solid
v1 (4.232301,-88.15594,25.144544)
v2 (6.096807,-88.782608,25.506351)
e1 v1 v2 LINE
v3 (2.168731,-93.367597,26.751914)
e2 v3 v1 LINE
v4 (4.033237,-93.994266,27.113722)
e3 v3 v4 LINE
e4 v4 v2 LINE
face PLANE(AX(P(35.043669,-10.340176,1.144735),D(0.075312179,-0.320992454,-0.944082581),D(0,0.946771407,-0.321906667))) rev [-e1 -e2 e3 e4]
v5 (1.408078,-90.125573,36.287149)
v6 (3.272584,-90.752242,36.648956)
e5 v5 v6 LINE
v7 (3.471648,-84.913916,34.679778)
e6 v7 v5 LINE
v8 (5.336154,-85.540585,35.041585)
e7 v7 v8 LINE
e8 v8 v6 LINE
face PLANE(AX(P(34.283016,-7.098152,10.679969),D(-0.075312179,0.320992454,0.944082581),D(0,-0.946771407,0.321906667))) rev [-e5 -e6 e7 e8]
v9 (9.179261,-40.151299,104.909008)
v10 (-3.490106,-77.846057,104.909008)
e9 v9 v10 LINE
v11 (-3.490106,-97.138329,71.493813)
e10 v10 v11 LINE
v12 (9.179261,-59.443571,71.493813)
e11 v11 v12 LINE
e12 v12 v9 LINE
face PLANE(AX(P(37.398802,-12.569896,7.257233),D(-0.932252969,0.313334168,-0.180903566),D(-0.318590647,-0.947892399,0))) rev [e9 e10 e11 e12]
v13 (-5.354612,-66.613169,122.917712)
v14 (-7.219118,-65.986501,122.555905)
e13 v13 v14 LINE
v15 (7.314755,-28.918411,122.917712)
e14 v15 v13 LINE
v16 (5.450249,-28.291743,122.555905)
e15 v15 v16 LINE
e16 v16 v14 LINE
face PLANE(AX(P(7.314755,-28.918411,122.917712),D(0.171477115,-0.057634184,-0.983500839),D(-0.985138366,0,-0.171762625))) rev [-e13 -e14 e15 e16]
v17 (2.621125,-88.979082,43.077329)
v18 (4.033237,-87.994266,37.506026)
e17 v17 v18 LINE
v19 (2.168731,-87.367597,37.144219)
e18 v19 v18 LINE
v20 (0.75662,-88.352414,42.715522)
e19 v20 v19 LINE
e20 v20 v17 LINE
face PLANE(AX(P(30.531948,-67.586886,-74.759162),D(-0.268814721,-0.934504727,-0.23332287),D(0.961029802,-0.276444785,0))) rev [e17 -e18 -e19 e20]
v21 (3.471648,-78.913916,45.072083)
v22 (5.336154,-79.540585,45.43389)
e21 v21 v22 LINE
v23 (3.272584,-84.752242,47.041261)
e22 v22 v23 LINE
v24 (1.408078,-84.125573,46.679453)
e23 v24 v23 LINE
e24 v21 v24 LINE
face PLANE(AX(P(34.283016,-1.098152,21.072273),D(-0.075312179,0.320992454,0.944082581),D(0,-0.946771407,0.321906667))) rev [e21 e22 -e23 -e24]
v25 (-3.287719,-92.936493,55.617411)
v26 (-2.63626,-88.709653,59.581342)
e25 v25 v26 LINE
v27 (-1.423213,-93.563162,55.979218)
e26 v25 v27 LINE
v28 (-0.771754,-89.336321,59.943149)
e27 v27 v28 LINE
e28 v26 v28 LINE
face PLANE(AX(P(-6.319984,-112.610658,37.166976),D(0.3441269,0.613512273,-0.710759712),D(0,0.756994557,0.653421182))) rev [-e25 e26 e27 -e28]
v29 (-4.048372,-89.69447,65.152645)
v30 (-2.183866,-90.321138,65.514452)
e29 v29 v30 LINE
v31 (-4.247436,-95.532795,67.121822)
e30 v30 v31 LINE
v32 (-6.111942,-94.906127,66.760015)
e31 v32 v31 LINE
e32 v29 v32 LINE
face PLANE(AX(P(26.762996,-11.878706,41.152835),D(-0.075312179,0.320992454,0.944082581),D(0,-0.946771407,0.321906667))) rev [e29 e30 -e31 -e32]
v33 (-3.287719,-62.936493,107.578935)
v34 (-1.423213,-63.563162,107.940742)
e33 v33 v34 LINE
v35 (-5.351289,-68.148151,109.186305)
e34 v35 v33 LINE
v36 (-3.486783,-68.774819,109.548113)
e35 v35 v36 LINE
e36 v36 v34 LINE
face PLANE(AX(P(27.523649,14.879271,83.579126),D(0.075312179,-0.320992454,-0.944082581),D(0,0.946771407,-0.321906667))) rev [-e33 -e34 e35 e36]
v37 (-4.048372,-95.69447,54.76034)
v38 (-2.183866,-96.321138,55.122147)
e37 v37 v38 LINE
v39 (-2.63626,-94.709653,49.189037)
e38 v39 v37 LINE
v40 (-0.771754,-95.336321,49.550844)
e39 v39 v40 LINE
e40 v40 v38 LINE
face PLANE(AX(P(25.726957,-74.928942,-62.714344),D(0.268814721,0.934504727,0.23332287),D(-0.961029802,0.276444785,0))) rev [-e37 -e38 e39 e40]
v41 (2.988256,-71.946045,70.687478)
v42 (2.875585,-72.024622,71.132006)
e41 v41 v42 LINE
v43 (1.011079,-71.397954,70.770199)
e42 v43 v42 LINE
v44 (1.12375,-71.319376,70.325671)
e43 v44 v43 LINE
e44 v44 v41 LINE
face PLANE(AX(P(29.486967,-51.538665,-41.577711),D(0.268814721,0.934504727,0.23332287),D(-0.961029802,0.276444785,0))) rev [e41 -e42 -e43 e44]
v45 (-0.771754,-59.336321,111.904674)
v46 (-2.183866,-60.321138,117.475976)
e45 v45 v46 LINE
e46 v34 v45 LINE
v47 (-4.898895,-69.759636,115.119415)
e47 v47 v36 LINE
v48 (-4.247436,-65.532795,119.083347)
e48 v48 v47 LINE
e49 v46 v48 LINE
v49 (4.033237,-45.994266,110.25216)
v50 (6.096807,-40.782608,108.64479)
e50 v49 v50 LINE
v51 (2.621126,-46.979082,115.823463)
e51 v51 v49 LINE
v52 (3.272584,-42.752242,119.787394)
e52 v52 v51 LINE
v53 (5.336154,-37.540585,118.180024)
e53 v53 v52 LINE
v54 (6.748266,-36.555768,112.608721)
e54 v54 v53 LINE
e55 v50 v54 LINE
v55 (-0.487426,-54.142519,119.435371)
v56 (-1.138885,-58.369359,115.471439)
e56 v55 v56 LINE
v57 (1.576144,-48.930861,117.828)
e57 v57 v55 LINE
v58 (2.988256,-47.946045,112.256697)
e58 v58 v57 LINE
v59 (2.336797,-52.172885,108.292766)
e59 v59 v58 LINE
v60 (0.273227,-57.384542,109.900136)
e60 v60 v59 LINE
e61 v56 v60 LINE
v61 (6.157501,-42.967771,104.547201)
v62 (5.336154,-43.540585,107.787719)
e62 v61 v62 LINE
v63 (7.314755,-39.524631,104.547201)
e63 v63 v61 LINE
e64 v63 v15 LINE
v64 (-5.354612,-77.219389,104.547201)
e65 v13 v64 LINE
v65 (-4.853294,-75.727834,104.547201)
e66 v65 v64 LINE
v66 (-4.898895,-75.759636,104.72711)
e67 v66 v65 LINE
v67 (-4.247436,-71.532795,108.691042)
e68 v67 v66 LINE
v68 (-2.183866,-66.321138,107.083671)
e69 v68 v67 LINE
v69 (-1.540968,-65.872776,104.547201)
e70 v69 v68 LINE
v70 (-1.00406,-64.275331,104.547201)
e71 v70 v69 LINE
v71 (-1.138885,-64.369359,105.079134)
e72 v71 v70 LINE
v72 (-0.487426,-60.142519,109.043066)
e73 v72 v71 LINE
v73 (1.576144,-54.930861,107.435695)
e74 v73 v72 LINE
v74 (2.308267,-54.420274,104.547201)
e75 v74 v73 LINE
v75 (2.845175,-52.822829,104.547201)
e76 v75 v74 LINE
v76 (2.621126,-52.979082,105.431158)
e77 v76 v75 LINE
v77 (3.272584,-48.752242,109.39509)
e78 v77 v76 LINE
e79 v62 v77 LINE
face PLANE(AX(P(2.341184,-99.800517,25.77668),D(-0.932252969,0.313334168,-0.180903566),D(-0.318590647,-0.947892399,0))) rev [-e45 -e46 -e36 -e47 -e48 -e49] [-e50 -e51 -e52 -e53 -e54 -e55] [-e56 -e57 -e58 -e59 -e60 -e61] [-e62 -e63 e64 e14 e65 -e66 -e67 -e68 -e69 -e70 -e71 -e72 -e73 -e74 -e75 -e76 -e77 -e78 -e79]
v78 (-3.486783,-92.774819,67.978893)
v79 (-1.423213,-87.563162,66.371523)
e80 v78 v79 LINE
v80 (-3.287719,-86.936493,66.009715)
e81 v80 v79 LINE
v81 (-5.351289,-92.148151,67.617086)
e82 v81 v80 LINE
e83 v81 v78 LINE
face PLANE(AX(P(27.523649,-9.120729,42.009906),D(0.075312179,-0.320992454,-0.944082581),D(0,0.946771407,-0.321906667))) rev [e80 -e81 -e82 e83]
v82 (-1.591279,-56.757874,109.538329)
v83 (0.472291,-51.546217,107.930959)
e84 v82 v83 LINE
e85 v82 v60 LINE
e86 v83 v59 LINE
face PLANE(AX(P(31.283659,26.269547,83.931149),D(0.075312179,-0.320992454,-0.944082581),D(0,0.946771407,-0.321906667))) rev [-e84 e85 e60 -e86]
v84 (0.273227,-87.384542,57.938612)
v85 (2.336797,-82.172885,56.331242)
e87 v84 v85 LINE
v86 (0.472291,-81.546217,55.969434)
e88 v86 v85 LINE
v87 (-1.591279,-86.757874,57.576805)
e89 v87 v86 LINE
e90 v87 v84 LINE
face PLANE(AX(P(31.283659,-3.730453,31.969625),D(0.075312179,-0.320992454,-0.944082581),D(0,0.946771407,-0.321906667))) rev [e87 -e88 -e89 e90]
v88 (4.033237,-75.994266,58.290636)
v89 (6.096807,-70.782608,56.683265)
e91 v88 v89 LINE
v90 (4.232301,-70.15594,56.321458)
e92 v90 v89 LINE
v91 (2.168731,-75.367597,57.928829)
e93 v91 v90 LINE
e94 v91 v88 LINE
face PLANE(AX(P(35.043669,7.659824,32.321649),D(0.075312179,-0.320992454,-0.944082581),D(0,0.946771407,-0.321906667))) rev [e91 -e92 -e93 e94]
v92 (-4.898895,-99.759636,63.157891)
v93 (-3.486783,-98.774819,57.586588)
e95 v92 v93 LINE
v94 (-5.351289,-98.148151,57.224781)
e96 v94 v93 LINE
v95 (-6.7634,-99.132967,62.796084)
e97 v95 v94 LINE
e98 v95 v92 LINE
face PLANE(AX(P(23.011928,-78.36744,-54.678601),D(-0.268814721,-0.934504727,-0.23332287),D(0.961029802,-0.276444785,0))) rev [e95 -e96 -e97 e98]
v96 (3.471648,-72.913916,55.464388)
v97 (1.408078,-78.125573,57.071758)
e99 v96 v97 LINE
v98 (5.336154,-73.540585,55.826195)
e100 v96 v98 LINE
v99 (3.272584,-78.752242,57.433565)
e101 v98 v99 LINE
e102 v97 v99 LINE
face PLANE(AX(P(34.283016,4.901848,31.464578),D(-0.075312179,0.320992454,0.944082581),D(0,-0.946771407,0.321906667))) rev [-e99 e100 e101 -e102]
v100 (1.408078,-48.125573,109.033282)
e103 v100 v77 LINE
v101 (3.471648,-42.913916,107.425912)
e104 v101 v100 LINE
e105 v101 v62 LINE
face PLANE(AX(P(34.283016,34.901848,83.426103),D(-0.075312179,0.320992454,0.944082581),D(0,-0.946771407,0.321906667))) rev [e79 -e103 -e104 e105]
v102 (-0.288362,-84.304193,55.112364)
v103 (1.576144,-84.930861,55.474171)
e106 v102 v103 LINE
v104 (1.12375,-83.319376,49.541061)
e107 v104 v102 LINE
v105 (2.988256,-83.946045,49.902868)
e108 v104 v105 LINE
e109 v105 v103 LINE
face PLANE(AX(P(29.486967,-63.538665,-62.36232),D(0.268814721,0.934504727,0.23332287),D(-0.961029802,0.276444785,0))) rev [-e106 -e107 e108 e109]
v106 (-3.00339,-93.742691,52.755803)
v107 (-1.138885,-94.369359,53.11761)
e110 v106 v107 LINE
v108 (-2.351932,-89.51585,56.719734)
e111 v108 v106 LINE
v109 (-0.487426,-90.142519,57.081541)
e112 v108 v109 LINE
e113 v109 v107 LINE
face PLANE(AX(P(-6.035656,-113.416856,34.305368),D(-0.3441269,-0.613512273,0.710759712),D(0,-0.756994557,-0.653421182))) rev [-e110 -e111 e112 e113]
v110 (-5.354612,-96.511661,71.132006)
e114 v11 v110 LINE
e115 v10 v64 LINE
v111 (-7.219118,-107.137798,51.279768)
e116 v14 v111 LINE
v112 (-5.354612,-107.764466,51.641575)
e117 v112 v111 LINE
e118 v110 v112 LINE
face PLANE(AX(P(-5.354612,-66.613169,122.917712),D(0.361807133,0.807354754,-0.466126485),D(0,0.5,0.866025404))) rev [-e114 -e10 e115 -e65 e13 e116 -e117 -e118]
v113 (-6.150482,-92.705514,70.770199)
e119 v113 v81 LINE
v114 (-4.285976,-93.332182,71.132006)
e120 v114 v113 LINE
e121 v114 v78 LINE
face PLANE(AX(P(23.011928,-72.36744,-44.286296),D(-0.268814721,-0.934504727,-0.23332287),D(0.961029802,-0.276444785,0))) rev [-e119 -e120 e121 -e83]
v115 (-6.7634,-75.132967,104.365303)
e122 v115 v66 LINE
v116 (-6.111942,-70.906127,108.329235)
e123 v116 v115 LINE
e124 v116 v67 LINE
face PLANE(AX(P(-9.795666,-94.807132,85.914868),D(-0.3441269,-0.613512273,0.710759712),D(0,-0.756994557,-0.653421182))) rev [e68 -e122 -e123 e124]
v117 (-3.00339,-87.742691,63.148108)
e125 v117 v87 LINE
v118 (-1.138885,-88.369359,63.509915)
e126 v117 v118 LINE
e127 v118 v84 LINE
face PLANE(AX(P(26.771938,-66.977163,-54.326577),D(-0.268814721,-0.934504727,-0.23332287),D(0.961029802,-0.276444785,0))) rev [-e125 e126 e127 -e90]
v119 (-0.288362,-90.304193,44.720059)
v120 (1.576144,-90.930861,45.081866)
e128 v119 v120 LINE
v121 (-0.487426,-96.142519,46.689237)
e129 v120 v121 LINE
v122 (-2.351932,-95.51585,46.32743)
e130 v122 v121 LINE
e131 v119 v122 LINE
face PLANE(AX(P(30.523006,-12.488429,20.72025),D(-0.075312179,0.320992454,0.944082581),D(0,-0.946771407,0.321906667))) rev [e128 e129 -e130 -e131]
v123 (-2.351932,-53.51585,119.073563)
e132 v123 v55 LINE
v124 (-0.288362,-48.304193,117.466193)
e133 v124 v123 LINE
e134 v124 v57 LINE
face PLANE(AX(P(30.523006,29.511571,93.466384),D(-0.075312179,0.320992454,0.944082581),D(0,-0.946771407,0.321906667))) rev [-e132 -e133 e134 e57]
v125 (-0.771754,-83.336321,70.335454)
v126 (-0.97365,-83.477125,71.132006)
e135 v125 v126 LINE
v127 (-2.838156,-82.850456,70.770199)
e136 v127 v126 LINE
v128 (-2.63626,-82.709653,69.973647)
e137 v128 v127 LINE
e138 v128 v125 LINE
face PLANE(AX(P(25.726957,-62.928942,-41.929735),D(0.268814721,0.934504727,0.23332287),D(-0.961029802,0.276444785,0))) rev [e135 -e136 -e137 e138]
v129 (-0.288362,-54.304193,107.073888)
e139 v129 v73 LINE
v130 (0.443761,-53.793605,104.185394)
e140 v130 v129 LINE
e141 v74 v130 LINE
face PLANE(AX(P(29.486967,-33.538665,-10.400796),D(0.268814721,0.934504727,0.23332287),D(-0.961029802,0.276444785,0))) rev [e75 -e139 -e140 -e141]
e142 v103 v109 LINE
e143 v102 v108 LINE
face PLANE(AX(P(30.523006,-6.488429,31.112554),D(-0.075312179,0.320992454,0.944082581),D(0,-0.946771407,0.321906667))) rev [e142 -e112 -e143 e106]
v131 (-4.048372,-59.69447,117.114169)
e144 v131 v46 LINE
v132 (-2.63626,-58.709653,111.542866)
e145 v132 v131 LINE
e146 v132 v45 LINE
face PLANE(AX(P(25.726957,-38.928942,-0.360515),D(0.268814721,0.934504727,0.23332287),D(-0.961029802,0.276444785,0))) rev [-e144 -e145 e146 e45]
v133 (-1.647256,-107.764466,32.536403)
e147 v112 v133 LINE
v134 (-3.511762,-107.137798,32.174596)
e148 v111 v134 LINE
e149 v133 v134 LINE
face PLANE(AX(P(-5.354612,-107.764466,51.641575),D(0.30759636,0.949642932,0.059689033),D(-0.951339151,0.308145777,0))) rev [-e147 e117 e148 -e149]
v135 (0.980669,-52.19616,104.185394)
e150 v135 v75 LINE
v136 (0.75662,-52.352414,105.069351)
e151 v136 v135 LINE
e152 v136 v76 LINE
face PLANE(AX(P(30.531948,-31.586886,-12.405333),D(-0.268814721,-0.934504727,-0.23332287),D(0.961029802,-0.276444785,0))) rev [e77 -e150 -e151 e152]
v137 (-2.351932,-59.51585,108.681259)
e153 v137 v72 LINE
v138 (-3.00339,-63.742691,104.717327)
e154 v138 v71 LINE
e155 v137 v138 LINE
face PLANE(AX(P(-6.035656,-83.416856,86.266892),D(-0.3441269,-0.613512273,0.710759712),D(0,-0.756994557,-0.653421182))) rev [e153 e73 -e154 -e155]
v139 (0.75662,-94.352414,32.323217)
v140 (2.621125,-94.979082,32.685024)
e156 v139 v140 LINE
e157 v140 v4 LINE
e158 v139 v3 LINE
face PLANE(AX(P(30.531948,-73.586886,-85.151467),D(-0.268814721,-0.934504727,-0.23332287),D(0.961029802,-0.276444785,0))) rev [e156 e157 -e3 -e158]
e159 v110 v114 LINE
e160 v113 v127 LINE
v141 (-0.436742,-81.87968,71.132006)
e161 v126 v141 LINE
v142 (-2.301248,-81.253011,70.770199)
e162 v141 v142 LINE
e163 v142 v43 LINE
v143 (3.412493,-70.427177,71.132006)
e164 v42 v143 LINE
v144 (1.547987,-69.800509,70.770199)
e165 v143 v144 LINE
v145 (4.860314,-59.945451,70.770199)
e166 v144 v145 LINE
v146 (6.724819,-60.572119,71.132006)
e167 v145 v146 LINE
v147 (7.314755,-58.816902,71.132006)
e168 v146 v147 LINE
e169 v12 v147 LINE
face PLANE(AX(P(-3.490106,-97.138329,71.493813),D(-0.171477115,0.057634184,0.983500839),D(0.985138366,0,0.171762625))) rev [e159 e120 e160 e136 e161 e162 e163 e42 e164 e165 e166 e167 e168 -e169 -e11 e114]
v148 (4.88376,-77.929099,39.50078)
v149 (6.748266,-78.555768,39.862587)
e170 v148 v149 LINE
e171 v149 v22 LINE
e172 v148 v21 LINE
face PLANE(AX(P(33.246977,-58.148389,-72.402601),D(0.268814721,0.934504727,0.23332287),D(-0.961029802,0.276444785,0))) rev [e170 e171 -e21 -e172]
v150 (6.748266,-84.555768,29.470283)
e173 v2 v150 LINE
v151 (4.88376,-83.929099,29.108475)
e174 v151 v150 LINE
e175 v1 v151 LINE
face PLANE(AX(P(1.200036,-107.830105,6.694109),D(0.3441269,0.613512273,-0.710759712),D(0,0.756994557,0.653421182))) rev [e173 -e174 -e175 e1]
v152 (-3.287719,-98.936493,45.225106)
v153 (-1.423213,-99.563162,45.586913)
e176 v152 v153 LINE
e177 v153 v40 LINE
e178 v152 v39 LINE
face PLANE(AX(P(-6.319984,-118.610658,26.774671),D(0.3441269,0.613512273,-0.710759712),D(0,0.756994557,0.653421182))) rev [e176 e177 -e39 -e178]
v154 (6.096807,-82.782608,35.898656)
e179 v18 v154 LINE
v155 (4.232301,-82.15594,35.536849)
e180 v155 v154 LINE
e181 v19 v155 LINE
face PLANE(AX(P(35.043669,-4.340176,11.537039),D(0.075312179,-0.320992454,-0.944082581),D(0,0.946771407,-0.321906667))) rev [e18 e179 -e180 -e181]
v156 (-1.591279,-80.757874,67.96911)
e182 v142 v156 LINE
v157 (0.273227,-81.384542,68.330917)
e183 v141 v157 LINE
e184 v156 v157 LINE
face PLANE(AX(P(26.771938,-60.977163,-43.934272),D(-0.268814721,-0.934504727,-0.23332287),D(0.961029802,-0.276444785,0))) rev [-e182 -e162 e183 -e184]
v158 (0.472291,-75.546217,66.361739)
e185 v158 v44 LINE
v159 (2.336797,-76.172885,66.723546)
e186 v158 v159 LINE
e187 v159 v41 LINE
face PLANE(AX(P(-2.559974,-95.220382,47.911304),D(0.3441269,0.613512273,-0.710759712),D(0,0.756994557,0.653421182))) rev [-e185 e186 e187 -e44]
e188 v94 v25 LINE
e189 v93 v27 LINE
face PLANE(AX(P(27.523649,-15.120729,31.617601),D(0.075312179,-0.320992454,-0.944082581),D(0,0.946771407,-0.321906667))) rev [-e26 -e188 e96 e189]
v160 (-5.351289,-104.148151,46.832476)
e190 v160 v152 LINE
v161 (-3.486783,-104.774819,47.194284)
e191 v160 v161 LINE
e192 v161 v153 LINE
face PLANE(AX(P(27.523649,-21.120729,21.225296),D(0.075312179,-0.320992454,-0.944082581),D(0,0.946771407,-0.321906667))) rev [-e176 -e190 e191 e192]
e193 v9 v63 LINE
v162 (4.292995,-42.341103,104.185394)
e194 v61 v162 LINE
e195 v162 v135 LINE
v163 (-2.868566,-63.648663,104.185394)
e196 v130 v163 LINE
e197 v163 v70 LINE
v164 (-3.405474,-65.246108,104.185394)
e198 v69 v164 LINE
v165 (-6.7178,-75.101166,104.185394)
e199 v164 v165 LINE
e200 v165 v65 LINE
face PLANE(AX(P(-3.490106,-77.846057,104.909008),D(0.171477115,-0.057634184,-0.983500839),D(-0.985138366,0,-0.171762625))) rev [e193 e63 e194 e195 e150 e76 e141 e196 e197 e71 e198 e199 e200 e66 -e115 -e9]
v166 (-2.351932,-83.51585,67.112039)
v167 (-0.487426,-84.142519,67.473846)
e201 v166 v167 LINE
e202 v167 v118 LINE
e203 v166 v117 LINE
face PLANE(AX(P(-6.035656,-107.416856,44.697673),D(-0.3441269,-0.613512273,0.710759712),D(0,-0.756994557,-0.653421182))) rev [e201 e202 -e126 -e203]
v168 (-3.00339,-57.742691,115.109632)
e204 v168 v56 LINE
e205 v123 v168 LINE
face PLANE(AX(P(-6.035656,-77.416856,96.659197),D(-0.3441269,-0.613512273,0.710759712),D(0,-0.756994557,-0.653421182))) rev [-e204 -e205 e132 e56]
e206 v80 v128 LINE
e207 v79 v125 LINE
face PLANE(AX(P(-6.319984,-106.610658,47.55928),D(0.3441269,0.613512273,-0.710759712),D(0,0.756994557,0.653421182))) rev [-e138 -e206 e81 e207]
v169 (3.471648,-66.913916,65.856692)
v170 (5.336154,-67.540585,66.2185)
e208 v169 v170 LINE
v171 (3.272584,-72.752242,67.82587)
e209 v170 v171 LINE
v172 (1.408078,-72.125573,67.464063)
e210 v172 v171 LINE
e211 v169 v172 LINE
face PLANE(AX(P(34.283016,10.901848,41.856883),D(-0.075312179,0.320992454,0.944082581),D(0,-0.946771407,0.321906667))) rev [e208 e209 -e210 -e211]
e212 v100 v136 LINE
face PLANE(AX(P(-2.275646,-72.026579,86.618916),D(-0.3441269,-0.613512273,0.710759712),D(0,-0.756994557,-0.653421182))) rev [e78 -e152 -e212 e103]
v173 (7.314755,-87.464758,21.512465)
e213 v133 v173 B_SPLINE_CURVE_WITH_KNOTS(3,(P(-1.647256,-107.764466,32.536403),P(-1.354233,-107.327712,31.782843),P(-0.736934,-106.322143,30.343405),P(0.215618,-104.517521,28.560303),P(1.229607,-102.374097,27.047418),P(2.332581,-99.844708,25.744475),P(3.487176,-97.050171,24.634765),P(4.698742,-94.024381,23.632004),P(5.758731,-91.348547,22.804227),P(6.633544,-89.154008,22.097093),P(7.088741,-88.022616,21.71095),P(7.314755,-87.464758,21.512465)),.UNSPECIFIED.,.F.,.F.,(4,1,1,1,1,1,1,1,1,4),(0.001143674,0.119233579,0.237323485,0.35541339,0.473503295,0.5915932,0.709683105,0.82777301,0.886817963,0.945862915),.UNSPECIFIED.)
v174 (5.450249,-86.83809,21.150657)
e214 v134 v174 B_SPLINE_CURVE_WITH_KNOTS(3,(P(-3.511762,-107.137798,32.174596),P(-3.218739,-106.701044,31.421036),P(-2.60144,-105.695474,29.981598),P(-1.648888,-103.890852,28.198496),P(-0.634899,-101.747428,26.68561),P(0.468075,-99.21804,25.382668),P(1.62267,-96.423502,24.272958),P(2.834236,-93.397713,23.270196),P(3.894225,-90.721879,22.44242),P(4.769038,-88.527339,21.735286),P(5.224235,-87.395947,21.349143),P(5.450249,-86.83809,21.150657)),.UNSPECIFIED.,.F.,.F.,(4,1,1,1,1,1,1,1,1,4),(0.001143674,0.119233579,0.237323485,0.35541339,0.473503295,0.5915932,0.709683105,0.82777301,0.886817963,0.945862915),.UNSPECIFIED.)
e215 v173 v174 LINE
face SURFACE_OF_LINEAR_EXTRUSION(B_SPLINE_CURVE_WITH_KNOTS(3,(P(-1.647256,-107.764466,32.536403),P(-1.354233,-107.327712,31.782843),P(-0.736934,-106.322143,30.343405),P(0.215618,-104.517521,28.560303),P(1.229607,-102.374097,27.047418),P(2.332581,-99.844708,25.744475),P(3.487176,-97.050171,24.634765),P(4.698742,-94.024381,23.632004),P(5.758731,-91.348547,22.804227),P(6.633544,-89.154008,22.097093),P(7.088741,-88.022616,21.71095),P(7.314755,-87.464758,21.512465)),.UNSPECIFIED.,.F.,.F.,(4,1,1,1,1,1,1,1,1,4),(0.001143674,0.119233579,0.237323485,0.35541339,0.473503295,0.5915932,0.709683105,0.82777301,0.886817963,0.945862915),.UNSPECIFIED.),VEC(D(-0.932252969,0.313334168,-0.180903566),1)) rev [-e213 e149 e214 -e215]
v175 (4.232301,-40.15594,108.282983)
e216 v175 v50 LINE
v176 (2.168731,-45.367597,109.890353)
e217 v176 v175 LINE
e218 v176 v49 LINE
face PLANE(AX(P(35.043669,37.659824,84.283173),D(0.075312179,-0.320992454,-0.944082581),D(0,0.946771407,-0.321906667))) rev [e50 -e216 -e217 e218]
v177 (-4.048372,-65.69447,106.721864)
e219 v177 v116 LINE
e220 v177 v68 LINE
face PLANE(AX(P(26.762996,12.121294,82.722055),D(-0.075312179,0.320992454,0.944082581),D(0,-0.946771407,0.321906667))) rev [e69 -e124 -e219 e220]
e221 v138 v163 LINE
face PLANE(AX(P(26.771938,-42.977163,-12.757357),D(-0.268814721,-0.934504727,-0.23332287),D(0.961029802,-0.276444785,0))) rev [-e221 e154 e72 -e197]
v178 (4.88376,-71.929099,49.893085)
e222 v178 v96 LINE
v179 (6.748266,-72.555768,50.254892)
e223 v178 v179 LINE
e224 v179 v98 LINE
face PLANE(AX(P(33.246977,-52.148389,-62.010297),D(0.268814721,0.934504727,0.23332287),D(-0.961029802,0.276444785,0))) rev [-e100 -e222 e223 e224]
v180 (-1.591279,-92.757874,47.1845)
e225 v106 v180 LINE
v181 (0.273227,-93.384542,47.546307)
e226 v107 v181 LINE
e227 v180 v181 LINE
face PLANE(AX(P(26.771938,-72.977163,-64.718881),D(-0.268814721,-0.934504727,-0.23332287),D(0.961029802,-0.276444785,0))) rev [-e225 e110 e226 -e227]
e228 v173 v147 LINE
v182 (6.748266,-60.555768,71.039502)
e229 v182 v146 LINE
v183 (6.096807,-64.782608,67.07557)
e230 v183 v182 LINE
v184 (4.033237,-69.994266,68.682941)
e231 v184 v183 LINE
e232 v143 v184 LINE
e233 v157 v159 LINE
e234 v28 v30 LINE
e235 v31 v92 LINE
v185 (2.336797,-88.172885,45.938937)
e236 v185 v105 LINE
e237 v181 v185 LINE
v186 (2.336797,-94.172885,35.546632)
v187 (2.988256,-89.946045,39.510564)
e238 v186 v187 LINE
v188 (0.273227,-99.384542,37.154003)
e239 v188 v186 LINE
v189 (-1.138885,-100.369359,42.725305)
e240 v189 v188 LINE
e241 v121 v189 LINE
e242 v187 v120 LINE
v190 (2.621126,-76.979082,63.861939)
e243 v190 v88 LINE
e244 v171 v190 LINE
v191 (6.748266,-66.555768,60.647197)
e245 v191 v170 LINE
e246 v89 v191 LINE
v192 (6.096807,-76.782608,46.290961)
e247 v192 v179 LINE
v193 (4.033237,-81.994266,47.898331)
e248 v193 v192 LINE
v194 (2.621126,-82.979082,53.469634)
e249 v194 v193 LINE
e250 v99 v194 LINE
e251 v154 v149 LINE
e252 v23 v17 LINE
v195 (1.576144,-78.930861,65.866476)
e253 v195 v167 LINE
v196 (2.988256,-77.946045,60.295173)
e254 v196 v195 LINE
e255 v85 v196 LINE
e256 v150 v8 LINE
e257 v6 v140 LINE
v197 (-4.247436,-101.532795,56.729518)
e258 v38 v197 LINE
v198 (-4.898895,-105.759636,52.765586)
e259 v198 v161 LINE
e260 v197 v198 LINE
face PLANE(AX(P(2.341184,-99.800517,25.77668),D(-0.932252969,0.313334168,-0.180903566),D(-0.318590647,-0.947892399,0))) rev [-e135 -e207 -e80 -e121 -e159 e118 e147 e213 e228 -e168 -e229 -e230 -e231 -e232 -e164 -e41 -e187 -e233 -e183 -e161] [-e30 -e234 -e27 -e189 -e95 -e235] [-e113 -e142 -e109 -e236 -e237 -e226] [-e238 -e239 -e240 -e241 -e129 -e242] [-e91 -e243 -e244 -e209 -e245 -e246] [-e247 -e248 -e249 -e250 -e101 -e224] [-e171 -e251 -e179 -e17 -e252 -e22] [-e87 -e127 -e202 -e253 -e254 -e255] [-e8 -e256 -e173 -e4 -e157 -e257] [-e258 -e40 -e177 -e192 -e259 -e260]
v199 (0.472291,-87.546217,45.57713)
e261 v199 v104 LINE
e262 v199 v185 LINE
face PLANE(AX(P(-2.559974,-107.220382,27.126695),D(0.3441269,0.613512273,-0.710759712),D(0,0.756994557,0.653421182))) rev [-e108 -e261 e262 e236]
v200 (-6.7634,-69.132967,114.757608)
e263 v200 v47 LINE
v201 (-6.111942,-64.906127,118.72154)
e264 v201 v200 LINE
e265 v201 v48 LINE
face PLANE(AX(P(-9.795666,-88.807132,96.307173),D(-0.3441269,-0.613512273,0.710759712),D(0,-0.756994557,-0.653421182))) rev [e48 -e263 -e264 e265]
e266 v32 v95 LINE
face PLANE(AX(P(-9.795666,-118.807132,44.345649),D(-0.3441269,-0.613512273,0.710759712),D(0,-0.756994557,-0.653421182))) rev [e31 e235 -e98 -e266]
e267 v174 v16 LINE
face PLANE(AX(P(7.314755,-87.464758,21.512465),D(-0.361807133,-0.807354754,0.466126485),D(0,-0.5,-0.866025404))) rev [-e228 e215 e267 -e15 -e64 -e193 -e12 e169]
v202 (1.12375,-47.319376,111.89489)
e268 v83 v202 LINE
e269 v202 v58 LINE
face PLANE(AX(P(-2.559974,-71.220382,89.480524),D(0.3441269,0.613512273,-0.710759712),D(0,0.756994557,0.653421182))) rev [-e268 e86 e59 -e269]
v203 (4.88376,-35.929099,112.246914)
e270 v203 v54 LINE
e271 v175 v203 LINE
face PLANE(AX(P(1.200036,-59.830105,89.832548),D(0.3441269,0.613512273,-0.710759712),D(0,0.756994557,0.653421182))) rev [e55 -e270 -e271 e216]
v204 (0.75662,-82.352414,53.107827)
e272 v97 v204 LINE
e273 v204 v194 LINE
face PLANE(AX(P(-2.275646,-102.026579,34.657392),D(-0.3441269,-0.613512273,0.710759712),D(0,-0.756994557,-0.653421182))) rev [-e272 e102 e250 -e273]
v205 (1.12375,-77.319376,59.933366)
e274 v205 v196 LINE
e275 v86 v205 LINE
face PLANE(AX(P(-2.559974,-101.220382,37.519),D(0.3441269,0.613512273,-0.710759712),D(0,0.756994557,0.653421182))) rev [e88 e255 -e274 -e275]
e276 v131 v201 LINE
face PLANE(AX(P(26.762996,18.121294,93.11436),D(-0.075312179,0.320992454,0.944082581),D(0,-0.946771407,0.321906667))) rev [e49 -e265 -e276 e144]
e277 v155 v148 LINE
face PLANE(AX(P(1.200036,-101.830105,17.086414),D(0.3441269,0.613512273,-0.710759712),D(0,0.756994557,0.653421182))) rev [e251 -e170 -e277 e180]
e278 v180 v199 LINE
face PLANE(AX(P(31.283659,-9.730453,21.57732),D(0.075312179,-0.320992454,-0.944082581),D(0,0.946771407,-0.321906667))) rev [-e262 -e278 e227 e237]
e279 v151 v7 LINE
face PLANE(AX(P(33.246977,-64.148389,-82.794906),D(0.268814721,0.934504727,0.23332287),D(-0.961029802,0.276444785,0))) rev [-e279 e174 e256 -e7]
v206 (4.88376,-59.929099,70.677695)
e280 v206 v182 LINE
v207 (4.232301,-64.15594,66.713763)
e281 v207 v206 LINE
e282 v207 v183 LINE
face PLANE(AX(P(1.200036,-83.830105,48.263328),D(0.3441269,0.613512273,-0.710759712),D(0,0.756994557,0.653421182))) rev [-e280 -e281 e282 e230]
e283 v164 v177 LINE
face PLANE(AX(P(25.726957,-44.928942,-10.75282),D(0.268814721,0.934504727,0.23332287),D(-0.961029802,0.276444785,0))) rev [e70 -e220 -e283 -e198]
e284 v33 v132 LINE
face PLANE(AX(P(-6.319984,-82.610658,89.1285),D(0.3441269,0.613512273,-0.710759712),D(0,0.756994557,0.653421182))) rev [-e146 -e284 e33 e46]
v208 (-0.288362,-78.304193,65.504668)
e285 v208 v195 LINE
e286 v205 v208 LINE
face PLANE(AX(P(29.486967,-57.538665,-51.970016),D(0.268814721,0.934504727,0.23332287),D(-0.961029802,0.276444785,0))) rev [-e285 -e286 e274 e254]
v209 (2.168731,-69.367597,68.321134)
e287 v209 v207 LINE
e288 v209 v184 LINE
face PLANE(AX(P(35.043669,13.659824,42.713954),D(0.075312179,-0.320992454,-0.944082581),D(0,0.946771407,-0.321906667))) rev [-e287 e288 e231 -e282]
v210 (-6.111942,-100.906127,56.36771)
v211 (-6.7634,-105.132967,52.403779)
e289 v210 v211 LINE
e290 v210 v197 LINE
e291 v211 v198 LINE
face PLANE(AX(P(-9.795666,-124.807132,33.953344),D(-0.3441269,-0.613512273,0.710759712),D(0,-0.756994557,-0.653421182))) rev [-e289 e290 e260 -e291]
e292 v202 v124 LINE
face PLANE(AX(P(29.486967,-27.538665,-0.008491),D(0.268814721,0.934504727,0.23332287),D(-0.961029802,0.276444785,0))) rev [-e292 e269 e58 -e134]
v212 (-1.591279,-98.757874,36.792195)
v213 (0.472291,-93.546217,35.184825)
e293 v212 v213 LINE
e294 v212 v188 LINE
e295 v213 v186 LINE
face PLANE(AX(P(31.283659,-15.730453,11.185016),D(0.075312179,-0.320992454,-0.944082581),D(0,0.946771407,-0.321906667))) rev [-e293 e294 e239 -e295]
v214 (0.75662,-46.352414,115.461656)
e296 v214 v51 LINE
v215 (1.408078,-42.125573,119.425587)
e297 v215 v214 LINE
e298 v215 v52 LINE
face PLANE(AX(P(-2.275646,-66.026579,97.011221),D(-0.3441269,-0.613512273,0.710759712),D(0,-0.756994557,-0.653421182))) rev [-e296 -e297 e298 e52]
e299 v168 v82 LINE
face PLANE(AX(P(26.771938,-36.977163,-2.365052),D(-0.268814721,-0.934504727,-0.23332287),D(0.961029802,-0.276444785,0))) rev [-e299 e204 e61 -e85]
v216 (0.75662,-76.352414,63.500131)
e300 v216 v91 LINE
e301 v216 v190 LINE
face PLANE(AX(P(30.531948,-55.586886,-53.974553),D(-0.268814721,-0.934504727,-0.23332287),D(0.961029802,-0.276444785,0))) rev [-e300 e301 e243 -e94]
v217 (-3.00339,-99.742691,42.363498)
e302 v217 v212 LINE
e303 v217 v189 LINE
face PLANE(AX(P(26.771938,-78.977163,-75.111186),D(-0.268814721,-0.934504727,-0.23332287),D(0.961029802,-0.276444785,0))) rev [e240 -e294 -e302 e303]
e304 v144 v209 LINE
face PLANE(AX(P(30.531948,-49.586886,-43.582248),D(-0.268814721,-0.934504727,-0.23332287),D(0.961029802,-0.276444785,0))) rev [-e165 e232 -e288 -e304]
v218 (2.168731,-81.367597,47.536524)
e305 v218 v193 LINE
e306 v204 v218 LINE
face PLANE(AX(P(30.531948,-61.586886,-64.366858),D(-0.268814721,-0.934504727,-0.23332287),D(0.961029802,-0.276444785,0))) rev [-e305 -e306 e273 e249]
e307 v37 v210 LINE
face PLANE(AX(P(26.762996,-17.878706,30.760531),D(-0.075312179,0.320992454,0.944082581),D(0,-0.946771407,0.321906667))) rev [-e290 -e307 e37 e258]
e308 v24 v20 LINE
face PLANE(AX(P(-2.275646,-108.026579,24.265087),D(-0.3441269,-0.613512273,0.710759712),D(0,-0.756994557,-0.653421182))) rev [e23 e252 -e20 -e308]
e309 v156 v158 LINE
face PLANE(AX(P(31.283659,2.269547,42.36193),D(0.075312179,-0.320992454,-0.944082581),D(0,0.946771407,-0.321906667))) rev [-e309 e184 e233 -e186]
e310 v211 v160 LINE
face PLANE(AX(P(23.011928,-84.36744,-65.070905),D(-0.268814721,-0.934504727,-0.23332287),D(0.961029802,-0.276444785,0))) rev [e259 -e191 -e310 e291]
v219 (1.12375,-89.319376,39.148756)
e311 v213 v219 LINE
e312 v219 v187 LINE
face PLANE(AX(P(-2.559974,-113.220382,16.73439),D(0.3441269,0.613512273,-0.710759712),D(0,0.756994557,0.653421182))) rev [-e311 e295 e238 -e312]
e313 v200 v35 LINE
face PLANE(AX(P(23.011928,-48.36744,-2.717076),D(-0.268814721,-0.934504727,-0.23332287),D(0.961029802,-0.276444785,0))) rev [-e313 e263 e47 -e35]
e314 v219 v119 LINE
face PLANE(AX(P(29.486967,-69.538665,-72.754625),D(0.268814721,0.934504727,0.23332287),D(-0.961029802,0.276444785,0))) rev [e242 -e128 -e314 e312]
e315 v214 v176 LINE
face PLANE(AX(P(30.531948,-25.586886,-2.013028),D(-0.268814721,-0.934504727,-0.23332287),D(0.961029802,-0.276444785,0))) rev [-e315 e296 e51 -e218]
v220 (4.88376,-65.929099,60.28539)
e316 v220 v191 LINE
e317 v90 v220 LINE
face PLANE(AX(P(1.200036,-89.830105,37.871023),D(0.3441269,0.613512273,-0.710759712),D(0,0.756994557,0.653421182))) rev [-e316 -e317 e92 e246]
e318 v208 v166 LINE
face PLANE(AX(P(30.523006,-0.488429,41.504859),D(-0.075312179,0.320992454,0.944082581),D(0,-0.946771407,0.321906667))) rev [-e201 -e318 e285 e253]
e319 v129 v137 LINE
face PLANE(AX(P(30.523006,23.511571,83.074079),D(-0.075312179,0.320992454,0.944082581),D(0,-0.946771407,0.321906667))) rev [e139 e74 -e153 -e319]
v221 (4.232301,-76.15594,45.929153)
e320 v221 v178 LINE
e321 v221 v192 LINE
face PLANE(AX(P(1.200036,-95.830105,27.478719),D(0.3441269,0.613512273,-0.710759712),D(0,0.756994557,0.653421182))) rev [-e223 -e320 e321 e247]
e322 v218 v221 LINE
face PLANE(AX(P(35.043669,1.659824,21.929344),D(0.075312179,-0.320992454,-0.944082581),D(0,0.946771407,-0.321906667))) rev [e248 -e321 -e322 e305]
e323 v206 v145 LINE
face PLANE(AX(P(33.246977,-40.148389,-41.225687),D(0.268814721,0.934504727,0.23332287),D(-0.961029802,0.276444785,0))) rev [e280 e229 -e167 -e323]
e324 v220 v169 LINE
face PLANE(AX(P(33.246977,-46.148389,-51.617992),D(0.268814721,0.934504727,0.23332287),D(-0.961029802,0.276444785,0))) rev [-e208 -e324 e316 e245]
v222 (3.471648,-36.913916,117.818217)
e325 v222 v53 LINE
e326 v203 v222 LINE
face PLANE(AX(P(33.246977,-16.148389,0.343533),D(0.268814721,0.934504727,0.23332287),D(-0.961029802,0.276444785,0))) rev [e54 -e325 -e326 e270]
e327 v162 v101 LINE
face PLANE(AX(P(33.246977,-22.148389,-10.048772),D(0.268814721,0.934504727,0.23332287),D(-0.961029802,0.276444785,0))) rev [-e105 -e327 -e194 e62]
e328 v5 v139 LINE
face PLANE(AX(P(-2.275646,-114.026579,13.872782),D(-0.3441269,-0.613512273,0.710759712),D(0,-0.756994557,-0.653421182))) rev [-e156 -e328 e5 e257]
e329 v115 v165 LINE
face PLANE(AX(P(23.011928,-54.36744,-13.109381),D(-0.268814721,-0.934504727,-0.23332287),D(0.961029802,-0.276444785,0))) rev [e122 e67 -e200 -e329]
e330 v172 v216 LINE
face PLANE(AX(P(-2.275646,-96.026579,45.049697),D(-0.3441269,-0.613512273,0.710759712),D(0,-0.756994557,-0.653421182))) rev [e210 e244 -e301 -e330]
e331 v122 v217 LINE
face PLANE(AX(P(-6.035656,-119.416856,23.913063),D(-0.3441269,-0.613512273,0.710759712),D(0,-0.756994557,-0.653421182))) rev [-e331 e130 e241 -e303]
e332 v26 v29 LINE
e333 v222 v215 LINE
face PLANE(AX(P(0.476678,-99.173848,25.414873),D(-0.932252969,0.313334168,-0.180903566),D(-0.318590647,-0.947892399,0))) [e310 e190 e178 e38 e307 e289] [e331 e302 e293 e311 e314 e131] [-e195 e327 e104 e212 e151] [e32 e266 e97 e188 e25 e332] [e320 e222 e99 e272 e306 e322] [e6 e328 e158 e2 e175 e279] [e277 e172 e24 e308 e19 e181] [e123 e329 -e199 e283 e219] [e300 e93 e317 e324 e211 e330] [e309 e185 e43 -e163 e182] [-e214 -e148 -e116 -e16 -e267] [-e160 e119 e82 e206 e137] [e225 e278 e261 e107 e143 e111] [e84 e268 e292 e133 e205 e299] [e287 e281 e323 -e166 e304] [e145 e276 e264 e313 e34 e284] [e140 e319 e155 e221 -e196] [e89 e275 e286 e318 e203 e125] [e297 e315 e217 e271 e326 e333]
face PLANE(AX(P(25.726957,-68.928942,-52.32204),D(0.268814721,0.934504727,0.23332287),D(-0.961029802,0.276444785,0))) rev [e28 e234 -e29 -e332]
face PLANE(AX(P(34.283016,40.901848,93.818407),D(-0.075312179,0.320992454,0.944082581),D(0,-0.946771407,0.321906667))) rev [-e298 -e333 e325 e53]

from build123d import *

# Parameters (mm, degrees)
BOSS_EXTRUDE1_DEPTH      = 2
CUT_EXTRUDE2_DEPTH       = 2
FILL_START               = 36.116581205
FILL_PATTERN1_DEPTH      = 2
BOSS_EXTRUDE2_DEPTH      = 2
BOSS_EXTRUDE2_DEPTH_BACK = 2


# Read off the part's stored shape, not the designer's step: Fill Pattern1
with BuildPart() as part:
    # Sketch1 → Boss-Extrude1 (new body)
    with BuildSketch(Plane(origin=(33.669790065, -11.316558939, 6.533618345), x_dir=(0.3075963595688898, 0.9496429323114018, 0.059689033255435724), z_dir=(0.9322529691900319, -0.3133341684384297, 0.1809035663699512))):
        with BuildLine():
            Line((-57.568945453, 121.68686406), (-100.902387075, 51.715943852))
            Line((-100.902387075, 51.715943852), (-100.902387075, 32.254389388))
            add(Edge.make_bspline(
                [(-100.902387075, 32.254389388), (-100.442473357, 31.458808563), (-99.383581078, 29.928136313), (-97.483264926, 27.996228976), (-95.226180551, 26.317886768), (-92.562665334, 24.828690878), (-89.619940932, 23.519356376), (-86.433701886, 22.304158353), (-83.615975501, 21.289615886), (-81.305064927, 20.428782251), (-80.113678401, 19.962997336), (-79.526238835, 19.725091457)],
                knots=[0.001143674, 0.001143674, 0.001143674, 0.001143674, 0.119233579, 0.237323485, 0.35541339, 0.473503295, 0.5915932, 0.709683105, 0.82777301, 0.886817963, 0.945862915, 0.945862915, 0.945862915, 0.945862915], degree=3))
            Line((-79.526238835, 19.725091457), (-17.875333173, 119.273395013))
            Line((-17.875333173, 119.273395013), (-57.568945453, 121.68686406))
        make_face()
    extrude(amount=BOSS_EXTRUDE1_DEPTH)

    # Sketch2 → Cut-Extrude2 (cut)
    with BuildSketch(Plane(origin=(35.534296004, -11.943227276, 6.895425478), x_dir=(0.30759635956877757, 0.9496429323114396, 0.05968903325541397), z_dir=(0.9322529691900542, -0.3133341684383154, 0.18090356637003419))):
        Polygon((-60.882260573, 113.944557721), (-59.845221607, 108.206275442), (-54.357203896, 106.235236392), (-49.906225151, 110.002479621), (-50.943264117, 115.7407619), (-56.431281828, 117.71180095), align=None)
    extrude(amount=-CUT_EXTRUDE2_DEPTH, mode=Mode.SUBTRACT)

    # Fill Pattern1 outline → Fill Pattern1 (cut)
    with BuildSketch(Plane(origin=(0, 0, 0), x_dir=(0.3075963595751989, 0.9496429323114397, 0.05968903322232153), z_dir=(0.9322529691900542, -0.31333416843831513, 0.18090356637003466)).offset(FILL_START)):
        Polygon((-82.988049322, 35.354420584), (-87.439028067, 31.587177355), (-86.4019891, 25.848895075), (-80.913971389, 23.877856025), (-76.462992645, 27.645099254), (-77.500031611, 33.383381534), align=None)
        Polygon((-38.760899761, 106.768419503), (-43.211878505, 103.001176274), (-42.174839539, 97.262893995), (-36.686821828, 95.291854945), (-32.235843083, 99.059098174), (-33.27288205, 104.797380453), align=None)
        Polygon((-50.755172908, 107.139110303), (-55.206151653, 103.371867074), (-54.169112686, 97.633584795), (-48.681094975, 95.662545745), (-44.230116231, 99.429788974), (-45.267155197, 105.168071253), align=None)
        Polygon((-45.079063984, 96.566419658), (-49.530042728, 92.799176429), (-48.493003762, 87.060894149), (-43.004986051, 85.089855099), (-38.554007306, 88.857098328), (-39.591046273, 94.595380608), align=None)
        Polygon((-62.749446055, 107.509801103), (-67.2004248, 103.742557873), (-66.163385834, 98.004275594), (-60.675368123, 96.033236544), (-56.224389378, 99.800479773), (-57.261428344, 105.538762052), align=None)
        Polygon((-44.437008685, 117.341110149), (-48.88798743, 113.573866919), (-47.850948463, 107.83558464), (-42.362930752, 105.86454559), (-37.911952008, 109.631788819), (-38.948990974, 115.370071098), align=None)
        Polygon((-32.442735538, 116.970419349), (-36.893714282, 113.20317612), (-35.856675316, 107.464893841), (-30.368657605, 105.493854791), (-25.91767886, 109.26109802), (-26.954717827, 114.999380299), align=None)
        Polygon((-88.022102947, 66.70180172), (-92.473081692, 62.934558491), (-91.436042726, 57.196276212), (-85.948025015, 55.225237161), (-81.49704627, 58.992480391), (-82.534085236, 64.73076267), align=None)
        Polygon((-70.351720876, 55.758420275), (-74.802699621, 51.991177046), (-73.765660654, 46.252894767), (-68.277642943, 44.281855717), (-63.826664199, 48.049098946), (-64.863703165, 53.787381225), align=None)
        Polygon((-81.703938724, 76.903801566), (-86.154917469, 73.136558336), (-85.117878503, 67.398276057), (-79.629860792, 65.427237007), (-75.178882047, 69.194480236), (-76.215921013, 74.932762515), align=None)
        Polygon((-76.0278298, 66.33111092), (-80.478808545, 62.563867691), (-79.441769579, 56.825585412), (-73.953751868, 54.854546362), (-69.502773123, 58.621789591), (-70.539812089, 64.36007187), align=None)
        Polygon((-94.34026717, 56.499801874), (-98.791245915, 52.732558645), (-97.754206949, 46.994276366), (-92.266189238, 45.023237316), (-87.815210493, 48.790480545), (-88.852249459, 54.528762824), align=None)
        Polygon((-88.664158246, 45.927111229), (-93.115136991, 42.159868), (-92.078098025, 36.421585721), (-86.590080314, 34.450546671), (-82.139101569, 38.2177899), (-83.176140535, 43.956072179), align=None)
        Polygon((-82.345994023, 56.129111075), (-86.796972768, 52.361867846), (-85.759933802, 46.623585566), (-80.271916091, 44.652546516), (-75.820937346, 48.419789745), (-76.857976312, 54.158072025), align=None)
        Polygon((-76.669885099, 45.556420429), (-81.120863844, 41.7891772), (-80.083824877, 36.050894921), (-74.595807166, 34.079855871), (-70.144828422, 37.8470991), (-71.181867388, 43.585381379), align=None)
        Polygon((-69.067610278, 97.307801257), (-73.518589023, 93.540558028), (-72.481550057, 87.802275749), (-66.993532346, 85.831236698), (-62.542553601, 89.598479928), (-63.579592567, 95.336762207), align=None)
        Polygon((-63.391501354, 86.735110612), (-67.842480099, 82.967867383), (-66.805441132, 77.229585103), (-61.317423421, 75.258546053), (-56.866444677, 79.025789282), (-57.903483643, 84.764071561), align=None)
        Polygon((-57.073337131, 96.937110457), (-61.524315876, 93.169867228), (-60.487276909, 87.431584949), (-54.999259198, 85.460545899), (-50.548280454, 89.227789128), (-51.58531942, 94.966071407), align=None)
        Polygon((-51.397228207, 86.364419812), (-55.848206951, 82.597176583), (-54.811167985, 76.858894304), (-49.323150274, 74.887855254), (-44.872171529, 78.655098483), (-45.909210496, 84.393380762), align=None)
        Polygon((-69.709665577, 76.533110766), (-74.160644322, 72.765867537), (-73.123605356, 67.027585258), (-67.635587645, 65.056546208), (-63.1846089, 68.823789437), (-64.221647866, 74.562071716), align=None)
        Polygon((-64.033556653, 65.960420121), (-68.484535398, 62.193176892), (-67.447496431, 56.454894612), (-61.95947872, 54.483855562), (-57.508499976, 58.251098791), (-58.545538942, 63.989381071), align=None)
        Polygon((-75.385774501, 87.105801411), (-79.836753246, 83.338558182), (-78.79971428, 77.600275903), (-73.311696569, 75.629236853), (-68.860717824, 79.396480082), (-69.89775679, 85.134762361), align=None)
        Polygon((-57.71539243, 76.162419966), (-62.166371175, 72.395176737), (-61.129332208, 66.656894458), (-55.641314497, 64.685855408), (-51.190335753, 68.453098637), (-52.227374719, 74.191380916), align=None)
    extrude(amount=FILL_PATTERN1_DEPTH, mode=Mode.SUBTRACT)

    # Sketch3 → Boss-Extrude2 (add, two sides: drawn at the far end of the back side and taken through both)
    with BuildSketch(Plane(origin=(35.534296004, -11.943227276, 6.895425478), x_dir=(0.3075963595751957, 0.9496429323114406, 0.05968903322232247), z_dir=(0.9322529691900543, -0.31333416843831224, 0.1809035663700394)).offset(-BOSS_EXTRUDE2_DEPTH_BACK)):
        Polygon((-68.737584877, 103.652755792), (-29.043972597, 101.239286747), (-49.359262726, 68.435994613), (-89.052875005, 70.849463659), align=None)
    extrude(amount=BOSS_EXTRUDE2_DEPTH + BOSS_EXTRUDE2_DEPTH_BACK)


solid = part.part
